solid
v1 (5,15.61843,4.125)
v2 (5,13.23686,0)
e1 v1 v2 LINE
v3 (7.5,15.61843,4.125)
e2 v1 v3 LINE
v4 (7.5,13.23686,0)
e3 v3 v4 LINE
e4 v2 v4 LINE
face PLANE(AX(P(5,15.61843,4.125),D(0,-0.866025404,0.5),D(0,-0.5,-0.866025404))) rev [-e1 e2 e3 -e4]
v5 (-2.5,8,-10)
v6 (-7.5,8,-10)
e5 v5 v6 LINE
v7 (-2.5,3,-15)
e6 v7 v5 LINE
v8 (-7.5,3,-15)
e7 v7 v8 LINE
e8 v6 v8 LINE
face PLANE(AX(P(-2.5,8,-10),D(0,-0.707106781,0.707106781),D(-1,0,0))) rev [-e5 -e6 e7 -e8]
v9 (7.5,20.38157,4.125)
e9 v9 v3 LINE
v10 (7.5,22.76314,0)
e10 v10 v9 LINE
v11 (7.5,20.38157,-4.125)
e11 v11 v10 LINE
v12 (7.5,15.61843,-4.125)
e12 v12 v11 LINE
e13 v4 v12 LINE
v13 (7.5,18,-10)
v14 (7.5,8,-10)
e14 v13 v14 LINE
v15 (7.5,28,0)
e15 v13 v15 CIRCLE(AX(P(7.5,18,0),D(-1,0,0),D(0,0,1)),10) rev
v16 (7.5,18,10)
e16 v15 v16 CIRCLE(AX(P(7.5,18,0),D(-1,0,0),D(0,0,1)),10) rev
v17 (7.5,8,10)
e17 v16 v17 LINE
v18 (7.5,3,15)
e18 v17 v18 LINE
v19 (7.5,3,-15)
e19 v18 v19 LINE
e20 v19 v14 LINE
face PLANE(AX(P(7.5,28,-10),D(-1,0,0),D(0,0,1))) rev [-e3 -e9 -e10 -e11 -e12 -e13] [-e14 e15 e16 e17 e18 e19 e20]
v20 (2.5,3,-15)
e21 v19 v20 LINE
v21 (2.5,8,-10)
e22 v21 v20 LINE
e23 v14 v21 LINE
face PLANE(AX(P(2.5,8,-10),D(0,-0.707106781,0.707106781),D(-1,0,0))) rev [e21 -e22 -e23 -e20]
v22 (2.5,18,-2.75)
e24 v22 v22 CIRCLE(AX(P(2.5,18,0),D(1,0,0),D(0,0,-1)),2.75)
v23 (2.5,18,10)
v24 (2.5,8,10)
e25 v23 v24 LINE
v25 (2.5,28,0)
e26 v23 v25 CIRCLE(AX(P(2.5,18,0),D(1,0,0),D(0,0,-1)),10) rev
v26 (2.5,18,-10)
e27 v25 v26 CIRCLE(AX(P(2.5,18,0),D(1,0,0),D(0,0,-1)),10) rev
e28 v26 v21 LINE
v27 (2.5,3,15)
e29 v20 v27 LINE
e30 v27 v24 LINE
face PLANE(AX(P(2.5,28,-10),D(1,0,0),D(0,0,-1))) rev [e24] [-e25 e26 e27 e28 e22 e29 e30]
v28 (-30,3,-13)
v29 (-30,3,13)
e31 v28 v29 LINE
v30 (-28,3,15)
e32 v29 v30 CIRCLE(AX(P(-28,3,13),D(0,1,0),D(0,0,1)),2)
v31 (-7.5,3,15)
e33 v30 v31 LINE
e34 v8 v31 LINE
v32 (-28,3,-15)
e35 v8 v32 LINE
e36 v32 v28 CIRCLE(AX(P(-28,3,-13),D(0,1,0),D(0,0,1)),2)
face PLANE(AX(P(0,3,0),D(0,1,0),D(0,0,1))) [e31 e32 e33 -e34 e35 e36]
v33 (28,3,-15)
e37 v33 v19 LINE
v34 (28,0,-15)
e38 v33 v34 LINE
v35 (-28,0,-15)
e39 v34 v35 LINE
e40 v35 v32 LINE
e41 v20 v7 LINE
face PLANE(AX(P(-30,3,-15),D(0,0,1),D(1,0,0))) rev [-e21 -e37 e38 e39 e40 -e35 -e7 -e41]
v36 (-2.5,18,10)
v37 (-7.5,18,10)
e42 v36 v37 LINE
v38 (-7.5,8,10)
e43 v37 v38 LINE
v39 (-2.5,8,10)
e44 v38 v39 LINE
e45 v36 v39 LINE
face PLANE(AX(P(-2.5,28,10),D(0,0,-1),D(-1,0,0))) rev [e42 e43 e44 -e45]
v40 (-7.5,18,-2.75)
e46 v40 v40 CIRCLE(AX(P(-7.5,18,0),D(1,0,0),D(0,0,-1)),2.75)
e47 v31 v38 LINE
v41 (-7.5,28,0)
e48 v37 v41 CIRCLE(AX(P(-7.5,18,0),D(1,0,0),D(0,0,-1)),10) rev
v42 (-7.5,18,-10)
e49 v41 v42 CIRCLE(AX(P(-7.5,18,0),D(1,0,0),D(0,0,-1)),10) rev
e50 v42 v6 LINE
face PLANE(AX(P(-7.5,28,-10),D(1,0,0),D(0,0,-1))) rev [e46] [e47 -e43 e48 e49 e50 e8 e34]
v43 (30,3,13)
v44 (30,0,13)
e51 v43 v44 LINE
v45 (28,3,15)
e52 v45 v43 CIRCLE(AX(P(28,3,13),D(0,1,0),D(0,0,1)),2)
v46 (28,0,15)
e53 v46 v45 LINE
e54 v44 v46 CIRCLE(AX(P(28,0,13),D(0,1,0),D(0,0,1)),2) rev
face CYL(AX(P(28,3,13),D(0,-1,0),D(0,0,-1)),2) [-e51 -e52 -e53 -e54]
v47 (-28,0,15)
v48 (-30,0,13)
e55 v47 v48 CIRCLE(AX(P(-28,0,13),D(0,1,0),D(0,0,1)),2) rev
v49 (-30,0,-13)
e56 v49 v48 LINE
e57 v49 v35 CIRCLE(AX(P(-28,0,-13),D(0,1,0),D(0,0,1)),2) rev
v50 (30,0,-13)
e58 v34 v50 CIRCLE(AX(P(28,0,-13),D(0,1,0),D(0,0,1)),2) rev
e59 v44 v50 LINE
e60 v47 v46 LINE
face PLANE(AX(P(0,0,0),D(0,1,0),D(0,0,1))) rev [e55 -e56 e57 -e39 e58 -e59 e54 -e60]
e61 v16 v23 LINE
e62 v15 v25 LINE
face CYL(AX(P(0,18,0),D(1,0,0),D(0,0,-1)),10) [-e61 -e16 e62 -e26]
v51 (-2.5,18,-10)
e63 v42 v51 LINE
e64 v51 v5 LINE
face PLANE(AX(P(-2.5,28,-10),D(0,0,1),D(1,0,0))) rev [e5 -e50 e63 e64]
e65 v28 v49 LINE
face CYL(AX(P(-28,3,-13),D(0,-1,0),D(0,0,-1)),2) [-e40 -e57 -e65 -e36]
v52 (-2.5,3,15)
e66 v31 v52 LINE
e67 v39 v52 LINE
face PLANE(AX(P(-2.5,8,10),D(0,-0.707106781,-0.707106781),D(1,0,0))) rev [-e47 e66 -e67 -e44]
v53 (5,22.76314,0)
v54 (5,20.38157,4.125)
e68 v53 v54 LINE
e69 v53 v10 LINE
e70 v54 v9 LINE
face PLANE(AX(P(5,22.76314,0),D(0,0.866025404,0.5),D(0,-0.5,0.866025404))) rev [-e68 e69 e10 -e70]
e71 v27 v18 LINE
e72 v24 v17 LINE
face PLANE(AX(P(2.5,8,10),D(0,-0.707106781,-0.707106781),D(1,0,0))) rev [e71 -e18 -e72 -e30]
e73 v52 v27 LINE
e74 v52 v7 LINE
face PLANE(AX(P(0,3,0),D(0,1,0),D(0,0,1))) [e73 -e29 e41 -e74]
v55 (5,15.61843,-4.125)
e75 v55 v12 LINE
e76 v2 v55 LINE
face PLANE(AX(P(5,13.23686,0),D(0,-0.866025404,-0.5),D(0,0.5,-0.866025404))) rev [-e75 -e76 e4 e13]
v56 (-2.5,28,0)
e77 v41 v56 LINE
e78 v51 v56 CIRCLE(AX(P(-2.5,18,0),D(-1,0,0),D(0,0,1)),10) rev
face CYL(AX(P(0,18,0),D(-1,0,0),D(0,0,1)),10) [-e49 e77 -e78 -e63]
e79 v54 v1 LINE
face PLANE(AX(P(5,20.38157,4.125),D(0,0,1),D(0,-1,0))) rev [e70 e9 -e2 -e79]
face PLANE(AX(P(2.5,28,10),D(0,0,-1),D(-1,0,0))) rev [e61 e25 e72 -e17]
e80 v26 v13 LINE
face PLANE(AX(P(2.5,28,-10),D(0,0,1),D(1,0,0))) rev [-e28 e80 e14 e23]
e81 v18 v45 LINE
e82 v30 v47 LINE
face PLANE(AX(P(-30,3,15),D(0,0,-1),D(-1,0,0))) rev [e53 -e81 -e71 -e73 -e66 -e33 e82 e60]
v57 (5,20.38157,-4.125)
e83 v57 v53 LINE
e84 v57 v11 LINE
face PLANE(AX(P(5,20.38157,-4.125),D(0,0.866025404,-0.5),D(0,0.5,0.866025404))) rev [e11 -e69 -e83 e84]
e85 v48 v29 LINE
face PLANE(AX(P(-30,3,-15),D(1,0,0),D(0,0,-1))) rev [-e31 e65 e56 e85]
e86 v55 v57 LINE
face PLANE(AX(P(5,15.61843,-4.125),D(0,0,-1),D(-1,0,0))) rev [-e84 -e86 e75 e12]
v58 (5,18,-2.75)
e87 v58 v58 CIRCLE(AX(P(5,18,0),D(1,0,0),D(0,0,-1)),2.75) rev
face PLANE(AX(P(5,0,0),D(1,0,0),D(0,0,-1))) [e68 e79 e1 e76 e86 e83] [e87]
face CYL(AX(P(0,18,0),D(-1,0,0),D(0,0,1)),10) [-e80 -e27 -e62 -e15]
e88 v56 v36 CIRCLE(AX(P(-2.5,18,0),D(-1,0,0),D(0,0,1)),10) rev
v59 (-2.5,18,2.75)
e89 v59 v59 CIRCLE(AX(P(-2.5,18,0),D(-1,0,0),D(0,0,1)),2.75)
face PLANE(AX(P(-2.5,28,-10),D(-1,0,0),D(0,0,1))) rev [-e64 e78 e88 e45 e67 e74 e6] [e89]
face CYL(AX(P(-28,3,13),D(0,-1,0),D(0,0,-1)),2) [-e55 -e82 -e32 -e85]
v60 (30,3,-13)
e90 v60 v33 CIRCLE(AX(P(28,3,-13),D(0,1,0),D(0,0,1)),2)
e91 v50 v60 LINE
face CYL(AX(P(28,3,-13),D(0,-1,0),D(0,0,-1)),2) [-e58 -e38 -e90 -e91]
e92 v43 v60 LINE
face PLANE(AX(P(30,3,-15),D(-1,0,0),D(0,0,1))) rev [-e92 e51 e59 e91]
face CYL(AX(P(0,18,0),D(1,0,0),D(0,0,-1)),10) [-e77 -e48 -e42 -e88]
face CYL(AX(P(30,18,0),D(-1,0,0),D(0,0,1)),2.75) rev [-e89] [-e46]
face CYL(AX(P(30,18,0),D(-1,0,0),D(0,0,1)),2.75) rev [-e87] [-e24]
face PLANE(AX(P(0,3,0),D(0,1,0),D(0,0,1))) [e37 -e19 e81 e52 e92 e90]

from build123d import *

# Parameters (mm, degrees)
SKETCH1_W               = 60
SKETCH1_H               = 30
BOSS_EXTRUDE1_DEPTH     = 3
FILLET2_R               = 2
SKETCH4_W               = 5
SKETCH4_H               = 20
BOSS_EXTRUDE2_DEPTH     = 25
FILLET3_R               = 10
CUT_EXTRUDE3_DEPTH      = 50.145193051
CUT_EXTRUDE3_DEPTH_BACK = 50.145193051
SKETCH5_R               = 2.75
CUT_EXTRUDE4_DEPTH      = 2.5
CHAMFER1_SIZE           = 5


with BuildPart() as part:
    # Sketch1 → Boss-Extrude1 (new body)
    with BuildSketch(Plane(origin=(0, 0, 0), x_dir=(1, 0, 0), z_dir=(0, 1, 0))):
        Rectangle(SKETCH1_W, SKETCH1_H)
    extrude(amount=BOSS_EXTRUDE1_DEPTH)

    # Fillet2
    fillet2_edges = [part.edges().sort_by_distance(p)[0] for p in [
        (-30, 1.5, -15),
        (30, 1.5, -15),
        (30, 1.5, 15),
        (-30, 1.5, 15),
    ]]
    fillet(fillet2_edges, radius=FILLET2_R)

    # Sketch4 → Boss-Extrude2 (add)
    with BuildSketch(Plane(origin=(0, 3, 0), x_dir=(1, 0, 0), z_dir=(0, 1, 0))):
        with Locations((-5, 0)):
            Rectangle(SKETCH4_W, SKETCH4_H)
        with Locations((5, 0)):
            Rectangle(SKETCH4_W, SKETCH4_H)
    extrude(amount=BOSS_EXTRUDE2_DEPTH)

    # Fillet3
    fillet3_edges = [part.edges().sort_by_distance(p)[0] for p in [
        (5, 28, 10),
        (5, 28, -10),
        (-5, 28, -10),
        (-5, 28, 10),
    ]]
    fillet(fillet3_edges, radius=FILLET3_R - 0.0001)  # a hair under: the kernel refuses the full size

    # Sketch5 → Cut-Extrude3 (cut, two sides: drawn at the far end of the back side and taken through both)
    with BuildSketch(Plane.ZY.offset(7.5).offset(-CUT_EXTRUDE3_DEPTH_BACK)):
        with Locations((0, 18)):
            Circle(SKETCH5_R)
    extrude(amount=CUT_EXTRUDE3_DEPTH + CUT_EXTRUDE3_DEPTH_BACK, mode=Mode.SUBTRACT)

    # Sketch6 → Cut-Extrude4 (cut)
    with BuildSketch(Plane(origin=(7.5, 0, 0), x_dir=(0, 0, -1), z_dir=(1, 0, 0))):
        Polygon((0, 13.236860279), (4.125, 15.61843014), (4.125, 20.38156986), (0, 22.763139721), (-4.125, 20.38156986), (-4.125, 15.61843014), align=None)
    extrude(amount=-CUT_EXTRUDE4_DEPTH, mode=Mode.SUBTRACT)

    # Chamfer1
    chamfer1_edges = [part.edges().sort_by_distance(p)[0] for p in [
        (-5, 3, -10),
        (-5, 3, 10),
        (5, 3, -10),
        (5, 3, 10),
    ]]
    chamfer(chamfer1_edges, length=CHAMFER1_SIZE - 0.0001)  # a hair under: the kernel refuses the full size


solid = part.part
